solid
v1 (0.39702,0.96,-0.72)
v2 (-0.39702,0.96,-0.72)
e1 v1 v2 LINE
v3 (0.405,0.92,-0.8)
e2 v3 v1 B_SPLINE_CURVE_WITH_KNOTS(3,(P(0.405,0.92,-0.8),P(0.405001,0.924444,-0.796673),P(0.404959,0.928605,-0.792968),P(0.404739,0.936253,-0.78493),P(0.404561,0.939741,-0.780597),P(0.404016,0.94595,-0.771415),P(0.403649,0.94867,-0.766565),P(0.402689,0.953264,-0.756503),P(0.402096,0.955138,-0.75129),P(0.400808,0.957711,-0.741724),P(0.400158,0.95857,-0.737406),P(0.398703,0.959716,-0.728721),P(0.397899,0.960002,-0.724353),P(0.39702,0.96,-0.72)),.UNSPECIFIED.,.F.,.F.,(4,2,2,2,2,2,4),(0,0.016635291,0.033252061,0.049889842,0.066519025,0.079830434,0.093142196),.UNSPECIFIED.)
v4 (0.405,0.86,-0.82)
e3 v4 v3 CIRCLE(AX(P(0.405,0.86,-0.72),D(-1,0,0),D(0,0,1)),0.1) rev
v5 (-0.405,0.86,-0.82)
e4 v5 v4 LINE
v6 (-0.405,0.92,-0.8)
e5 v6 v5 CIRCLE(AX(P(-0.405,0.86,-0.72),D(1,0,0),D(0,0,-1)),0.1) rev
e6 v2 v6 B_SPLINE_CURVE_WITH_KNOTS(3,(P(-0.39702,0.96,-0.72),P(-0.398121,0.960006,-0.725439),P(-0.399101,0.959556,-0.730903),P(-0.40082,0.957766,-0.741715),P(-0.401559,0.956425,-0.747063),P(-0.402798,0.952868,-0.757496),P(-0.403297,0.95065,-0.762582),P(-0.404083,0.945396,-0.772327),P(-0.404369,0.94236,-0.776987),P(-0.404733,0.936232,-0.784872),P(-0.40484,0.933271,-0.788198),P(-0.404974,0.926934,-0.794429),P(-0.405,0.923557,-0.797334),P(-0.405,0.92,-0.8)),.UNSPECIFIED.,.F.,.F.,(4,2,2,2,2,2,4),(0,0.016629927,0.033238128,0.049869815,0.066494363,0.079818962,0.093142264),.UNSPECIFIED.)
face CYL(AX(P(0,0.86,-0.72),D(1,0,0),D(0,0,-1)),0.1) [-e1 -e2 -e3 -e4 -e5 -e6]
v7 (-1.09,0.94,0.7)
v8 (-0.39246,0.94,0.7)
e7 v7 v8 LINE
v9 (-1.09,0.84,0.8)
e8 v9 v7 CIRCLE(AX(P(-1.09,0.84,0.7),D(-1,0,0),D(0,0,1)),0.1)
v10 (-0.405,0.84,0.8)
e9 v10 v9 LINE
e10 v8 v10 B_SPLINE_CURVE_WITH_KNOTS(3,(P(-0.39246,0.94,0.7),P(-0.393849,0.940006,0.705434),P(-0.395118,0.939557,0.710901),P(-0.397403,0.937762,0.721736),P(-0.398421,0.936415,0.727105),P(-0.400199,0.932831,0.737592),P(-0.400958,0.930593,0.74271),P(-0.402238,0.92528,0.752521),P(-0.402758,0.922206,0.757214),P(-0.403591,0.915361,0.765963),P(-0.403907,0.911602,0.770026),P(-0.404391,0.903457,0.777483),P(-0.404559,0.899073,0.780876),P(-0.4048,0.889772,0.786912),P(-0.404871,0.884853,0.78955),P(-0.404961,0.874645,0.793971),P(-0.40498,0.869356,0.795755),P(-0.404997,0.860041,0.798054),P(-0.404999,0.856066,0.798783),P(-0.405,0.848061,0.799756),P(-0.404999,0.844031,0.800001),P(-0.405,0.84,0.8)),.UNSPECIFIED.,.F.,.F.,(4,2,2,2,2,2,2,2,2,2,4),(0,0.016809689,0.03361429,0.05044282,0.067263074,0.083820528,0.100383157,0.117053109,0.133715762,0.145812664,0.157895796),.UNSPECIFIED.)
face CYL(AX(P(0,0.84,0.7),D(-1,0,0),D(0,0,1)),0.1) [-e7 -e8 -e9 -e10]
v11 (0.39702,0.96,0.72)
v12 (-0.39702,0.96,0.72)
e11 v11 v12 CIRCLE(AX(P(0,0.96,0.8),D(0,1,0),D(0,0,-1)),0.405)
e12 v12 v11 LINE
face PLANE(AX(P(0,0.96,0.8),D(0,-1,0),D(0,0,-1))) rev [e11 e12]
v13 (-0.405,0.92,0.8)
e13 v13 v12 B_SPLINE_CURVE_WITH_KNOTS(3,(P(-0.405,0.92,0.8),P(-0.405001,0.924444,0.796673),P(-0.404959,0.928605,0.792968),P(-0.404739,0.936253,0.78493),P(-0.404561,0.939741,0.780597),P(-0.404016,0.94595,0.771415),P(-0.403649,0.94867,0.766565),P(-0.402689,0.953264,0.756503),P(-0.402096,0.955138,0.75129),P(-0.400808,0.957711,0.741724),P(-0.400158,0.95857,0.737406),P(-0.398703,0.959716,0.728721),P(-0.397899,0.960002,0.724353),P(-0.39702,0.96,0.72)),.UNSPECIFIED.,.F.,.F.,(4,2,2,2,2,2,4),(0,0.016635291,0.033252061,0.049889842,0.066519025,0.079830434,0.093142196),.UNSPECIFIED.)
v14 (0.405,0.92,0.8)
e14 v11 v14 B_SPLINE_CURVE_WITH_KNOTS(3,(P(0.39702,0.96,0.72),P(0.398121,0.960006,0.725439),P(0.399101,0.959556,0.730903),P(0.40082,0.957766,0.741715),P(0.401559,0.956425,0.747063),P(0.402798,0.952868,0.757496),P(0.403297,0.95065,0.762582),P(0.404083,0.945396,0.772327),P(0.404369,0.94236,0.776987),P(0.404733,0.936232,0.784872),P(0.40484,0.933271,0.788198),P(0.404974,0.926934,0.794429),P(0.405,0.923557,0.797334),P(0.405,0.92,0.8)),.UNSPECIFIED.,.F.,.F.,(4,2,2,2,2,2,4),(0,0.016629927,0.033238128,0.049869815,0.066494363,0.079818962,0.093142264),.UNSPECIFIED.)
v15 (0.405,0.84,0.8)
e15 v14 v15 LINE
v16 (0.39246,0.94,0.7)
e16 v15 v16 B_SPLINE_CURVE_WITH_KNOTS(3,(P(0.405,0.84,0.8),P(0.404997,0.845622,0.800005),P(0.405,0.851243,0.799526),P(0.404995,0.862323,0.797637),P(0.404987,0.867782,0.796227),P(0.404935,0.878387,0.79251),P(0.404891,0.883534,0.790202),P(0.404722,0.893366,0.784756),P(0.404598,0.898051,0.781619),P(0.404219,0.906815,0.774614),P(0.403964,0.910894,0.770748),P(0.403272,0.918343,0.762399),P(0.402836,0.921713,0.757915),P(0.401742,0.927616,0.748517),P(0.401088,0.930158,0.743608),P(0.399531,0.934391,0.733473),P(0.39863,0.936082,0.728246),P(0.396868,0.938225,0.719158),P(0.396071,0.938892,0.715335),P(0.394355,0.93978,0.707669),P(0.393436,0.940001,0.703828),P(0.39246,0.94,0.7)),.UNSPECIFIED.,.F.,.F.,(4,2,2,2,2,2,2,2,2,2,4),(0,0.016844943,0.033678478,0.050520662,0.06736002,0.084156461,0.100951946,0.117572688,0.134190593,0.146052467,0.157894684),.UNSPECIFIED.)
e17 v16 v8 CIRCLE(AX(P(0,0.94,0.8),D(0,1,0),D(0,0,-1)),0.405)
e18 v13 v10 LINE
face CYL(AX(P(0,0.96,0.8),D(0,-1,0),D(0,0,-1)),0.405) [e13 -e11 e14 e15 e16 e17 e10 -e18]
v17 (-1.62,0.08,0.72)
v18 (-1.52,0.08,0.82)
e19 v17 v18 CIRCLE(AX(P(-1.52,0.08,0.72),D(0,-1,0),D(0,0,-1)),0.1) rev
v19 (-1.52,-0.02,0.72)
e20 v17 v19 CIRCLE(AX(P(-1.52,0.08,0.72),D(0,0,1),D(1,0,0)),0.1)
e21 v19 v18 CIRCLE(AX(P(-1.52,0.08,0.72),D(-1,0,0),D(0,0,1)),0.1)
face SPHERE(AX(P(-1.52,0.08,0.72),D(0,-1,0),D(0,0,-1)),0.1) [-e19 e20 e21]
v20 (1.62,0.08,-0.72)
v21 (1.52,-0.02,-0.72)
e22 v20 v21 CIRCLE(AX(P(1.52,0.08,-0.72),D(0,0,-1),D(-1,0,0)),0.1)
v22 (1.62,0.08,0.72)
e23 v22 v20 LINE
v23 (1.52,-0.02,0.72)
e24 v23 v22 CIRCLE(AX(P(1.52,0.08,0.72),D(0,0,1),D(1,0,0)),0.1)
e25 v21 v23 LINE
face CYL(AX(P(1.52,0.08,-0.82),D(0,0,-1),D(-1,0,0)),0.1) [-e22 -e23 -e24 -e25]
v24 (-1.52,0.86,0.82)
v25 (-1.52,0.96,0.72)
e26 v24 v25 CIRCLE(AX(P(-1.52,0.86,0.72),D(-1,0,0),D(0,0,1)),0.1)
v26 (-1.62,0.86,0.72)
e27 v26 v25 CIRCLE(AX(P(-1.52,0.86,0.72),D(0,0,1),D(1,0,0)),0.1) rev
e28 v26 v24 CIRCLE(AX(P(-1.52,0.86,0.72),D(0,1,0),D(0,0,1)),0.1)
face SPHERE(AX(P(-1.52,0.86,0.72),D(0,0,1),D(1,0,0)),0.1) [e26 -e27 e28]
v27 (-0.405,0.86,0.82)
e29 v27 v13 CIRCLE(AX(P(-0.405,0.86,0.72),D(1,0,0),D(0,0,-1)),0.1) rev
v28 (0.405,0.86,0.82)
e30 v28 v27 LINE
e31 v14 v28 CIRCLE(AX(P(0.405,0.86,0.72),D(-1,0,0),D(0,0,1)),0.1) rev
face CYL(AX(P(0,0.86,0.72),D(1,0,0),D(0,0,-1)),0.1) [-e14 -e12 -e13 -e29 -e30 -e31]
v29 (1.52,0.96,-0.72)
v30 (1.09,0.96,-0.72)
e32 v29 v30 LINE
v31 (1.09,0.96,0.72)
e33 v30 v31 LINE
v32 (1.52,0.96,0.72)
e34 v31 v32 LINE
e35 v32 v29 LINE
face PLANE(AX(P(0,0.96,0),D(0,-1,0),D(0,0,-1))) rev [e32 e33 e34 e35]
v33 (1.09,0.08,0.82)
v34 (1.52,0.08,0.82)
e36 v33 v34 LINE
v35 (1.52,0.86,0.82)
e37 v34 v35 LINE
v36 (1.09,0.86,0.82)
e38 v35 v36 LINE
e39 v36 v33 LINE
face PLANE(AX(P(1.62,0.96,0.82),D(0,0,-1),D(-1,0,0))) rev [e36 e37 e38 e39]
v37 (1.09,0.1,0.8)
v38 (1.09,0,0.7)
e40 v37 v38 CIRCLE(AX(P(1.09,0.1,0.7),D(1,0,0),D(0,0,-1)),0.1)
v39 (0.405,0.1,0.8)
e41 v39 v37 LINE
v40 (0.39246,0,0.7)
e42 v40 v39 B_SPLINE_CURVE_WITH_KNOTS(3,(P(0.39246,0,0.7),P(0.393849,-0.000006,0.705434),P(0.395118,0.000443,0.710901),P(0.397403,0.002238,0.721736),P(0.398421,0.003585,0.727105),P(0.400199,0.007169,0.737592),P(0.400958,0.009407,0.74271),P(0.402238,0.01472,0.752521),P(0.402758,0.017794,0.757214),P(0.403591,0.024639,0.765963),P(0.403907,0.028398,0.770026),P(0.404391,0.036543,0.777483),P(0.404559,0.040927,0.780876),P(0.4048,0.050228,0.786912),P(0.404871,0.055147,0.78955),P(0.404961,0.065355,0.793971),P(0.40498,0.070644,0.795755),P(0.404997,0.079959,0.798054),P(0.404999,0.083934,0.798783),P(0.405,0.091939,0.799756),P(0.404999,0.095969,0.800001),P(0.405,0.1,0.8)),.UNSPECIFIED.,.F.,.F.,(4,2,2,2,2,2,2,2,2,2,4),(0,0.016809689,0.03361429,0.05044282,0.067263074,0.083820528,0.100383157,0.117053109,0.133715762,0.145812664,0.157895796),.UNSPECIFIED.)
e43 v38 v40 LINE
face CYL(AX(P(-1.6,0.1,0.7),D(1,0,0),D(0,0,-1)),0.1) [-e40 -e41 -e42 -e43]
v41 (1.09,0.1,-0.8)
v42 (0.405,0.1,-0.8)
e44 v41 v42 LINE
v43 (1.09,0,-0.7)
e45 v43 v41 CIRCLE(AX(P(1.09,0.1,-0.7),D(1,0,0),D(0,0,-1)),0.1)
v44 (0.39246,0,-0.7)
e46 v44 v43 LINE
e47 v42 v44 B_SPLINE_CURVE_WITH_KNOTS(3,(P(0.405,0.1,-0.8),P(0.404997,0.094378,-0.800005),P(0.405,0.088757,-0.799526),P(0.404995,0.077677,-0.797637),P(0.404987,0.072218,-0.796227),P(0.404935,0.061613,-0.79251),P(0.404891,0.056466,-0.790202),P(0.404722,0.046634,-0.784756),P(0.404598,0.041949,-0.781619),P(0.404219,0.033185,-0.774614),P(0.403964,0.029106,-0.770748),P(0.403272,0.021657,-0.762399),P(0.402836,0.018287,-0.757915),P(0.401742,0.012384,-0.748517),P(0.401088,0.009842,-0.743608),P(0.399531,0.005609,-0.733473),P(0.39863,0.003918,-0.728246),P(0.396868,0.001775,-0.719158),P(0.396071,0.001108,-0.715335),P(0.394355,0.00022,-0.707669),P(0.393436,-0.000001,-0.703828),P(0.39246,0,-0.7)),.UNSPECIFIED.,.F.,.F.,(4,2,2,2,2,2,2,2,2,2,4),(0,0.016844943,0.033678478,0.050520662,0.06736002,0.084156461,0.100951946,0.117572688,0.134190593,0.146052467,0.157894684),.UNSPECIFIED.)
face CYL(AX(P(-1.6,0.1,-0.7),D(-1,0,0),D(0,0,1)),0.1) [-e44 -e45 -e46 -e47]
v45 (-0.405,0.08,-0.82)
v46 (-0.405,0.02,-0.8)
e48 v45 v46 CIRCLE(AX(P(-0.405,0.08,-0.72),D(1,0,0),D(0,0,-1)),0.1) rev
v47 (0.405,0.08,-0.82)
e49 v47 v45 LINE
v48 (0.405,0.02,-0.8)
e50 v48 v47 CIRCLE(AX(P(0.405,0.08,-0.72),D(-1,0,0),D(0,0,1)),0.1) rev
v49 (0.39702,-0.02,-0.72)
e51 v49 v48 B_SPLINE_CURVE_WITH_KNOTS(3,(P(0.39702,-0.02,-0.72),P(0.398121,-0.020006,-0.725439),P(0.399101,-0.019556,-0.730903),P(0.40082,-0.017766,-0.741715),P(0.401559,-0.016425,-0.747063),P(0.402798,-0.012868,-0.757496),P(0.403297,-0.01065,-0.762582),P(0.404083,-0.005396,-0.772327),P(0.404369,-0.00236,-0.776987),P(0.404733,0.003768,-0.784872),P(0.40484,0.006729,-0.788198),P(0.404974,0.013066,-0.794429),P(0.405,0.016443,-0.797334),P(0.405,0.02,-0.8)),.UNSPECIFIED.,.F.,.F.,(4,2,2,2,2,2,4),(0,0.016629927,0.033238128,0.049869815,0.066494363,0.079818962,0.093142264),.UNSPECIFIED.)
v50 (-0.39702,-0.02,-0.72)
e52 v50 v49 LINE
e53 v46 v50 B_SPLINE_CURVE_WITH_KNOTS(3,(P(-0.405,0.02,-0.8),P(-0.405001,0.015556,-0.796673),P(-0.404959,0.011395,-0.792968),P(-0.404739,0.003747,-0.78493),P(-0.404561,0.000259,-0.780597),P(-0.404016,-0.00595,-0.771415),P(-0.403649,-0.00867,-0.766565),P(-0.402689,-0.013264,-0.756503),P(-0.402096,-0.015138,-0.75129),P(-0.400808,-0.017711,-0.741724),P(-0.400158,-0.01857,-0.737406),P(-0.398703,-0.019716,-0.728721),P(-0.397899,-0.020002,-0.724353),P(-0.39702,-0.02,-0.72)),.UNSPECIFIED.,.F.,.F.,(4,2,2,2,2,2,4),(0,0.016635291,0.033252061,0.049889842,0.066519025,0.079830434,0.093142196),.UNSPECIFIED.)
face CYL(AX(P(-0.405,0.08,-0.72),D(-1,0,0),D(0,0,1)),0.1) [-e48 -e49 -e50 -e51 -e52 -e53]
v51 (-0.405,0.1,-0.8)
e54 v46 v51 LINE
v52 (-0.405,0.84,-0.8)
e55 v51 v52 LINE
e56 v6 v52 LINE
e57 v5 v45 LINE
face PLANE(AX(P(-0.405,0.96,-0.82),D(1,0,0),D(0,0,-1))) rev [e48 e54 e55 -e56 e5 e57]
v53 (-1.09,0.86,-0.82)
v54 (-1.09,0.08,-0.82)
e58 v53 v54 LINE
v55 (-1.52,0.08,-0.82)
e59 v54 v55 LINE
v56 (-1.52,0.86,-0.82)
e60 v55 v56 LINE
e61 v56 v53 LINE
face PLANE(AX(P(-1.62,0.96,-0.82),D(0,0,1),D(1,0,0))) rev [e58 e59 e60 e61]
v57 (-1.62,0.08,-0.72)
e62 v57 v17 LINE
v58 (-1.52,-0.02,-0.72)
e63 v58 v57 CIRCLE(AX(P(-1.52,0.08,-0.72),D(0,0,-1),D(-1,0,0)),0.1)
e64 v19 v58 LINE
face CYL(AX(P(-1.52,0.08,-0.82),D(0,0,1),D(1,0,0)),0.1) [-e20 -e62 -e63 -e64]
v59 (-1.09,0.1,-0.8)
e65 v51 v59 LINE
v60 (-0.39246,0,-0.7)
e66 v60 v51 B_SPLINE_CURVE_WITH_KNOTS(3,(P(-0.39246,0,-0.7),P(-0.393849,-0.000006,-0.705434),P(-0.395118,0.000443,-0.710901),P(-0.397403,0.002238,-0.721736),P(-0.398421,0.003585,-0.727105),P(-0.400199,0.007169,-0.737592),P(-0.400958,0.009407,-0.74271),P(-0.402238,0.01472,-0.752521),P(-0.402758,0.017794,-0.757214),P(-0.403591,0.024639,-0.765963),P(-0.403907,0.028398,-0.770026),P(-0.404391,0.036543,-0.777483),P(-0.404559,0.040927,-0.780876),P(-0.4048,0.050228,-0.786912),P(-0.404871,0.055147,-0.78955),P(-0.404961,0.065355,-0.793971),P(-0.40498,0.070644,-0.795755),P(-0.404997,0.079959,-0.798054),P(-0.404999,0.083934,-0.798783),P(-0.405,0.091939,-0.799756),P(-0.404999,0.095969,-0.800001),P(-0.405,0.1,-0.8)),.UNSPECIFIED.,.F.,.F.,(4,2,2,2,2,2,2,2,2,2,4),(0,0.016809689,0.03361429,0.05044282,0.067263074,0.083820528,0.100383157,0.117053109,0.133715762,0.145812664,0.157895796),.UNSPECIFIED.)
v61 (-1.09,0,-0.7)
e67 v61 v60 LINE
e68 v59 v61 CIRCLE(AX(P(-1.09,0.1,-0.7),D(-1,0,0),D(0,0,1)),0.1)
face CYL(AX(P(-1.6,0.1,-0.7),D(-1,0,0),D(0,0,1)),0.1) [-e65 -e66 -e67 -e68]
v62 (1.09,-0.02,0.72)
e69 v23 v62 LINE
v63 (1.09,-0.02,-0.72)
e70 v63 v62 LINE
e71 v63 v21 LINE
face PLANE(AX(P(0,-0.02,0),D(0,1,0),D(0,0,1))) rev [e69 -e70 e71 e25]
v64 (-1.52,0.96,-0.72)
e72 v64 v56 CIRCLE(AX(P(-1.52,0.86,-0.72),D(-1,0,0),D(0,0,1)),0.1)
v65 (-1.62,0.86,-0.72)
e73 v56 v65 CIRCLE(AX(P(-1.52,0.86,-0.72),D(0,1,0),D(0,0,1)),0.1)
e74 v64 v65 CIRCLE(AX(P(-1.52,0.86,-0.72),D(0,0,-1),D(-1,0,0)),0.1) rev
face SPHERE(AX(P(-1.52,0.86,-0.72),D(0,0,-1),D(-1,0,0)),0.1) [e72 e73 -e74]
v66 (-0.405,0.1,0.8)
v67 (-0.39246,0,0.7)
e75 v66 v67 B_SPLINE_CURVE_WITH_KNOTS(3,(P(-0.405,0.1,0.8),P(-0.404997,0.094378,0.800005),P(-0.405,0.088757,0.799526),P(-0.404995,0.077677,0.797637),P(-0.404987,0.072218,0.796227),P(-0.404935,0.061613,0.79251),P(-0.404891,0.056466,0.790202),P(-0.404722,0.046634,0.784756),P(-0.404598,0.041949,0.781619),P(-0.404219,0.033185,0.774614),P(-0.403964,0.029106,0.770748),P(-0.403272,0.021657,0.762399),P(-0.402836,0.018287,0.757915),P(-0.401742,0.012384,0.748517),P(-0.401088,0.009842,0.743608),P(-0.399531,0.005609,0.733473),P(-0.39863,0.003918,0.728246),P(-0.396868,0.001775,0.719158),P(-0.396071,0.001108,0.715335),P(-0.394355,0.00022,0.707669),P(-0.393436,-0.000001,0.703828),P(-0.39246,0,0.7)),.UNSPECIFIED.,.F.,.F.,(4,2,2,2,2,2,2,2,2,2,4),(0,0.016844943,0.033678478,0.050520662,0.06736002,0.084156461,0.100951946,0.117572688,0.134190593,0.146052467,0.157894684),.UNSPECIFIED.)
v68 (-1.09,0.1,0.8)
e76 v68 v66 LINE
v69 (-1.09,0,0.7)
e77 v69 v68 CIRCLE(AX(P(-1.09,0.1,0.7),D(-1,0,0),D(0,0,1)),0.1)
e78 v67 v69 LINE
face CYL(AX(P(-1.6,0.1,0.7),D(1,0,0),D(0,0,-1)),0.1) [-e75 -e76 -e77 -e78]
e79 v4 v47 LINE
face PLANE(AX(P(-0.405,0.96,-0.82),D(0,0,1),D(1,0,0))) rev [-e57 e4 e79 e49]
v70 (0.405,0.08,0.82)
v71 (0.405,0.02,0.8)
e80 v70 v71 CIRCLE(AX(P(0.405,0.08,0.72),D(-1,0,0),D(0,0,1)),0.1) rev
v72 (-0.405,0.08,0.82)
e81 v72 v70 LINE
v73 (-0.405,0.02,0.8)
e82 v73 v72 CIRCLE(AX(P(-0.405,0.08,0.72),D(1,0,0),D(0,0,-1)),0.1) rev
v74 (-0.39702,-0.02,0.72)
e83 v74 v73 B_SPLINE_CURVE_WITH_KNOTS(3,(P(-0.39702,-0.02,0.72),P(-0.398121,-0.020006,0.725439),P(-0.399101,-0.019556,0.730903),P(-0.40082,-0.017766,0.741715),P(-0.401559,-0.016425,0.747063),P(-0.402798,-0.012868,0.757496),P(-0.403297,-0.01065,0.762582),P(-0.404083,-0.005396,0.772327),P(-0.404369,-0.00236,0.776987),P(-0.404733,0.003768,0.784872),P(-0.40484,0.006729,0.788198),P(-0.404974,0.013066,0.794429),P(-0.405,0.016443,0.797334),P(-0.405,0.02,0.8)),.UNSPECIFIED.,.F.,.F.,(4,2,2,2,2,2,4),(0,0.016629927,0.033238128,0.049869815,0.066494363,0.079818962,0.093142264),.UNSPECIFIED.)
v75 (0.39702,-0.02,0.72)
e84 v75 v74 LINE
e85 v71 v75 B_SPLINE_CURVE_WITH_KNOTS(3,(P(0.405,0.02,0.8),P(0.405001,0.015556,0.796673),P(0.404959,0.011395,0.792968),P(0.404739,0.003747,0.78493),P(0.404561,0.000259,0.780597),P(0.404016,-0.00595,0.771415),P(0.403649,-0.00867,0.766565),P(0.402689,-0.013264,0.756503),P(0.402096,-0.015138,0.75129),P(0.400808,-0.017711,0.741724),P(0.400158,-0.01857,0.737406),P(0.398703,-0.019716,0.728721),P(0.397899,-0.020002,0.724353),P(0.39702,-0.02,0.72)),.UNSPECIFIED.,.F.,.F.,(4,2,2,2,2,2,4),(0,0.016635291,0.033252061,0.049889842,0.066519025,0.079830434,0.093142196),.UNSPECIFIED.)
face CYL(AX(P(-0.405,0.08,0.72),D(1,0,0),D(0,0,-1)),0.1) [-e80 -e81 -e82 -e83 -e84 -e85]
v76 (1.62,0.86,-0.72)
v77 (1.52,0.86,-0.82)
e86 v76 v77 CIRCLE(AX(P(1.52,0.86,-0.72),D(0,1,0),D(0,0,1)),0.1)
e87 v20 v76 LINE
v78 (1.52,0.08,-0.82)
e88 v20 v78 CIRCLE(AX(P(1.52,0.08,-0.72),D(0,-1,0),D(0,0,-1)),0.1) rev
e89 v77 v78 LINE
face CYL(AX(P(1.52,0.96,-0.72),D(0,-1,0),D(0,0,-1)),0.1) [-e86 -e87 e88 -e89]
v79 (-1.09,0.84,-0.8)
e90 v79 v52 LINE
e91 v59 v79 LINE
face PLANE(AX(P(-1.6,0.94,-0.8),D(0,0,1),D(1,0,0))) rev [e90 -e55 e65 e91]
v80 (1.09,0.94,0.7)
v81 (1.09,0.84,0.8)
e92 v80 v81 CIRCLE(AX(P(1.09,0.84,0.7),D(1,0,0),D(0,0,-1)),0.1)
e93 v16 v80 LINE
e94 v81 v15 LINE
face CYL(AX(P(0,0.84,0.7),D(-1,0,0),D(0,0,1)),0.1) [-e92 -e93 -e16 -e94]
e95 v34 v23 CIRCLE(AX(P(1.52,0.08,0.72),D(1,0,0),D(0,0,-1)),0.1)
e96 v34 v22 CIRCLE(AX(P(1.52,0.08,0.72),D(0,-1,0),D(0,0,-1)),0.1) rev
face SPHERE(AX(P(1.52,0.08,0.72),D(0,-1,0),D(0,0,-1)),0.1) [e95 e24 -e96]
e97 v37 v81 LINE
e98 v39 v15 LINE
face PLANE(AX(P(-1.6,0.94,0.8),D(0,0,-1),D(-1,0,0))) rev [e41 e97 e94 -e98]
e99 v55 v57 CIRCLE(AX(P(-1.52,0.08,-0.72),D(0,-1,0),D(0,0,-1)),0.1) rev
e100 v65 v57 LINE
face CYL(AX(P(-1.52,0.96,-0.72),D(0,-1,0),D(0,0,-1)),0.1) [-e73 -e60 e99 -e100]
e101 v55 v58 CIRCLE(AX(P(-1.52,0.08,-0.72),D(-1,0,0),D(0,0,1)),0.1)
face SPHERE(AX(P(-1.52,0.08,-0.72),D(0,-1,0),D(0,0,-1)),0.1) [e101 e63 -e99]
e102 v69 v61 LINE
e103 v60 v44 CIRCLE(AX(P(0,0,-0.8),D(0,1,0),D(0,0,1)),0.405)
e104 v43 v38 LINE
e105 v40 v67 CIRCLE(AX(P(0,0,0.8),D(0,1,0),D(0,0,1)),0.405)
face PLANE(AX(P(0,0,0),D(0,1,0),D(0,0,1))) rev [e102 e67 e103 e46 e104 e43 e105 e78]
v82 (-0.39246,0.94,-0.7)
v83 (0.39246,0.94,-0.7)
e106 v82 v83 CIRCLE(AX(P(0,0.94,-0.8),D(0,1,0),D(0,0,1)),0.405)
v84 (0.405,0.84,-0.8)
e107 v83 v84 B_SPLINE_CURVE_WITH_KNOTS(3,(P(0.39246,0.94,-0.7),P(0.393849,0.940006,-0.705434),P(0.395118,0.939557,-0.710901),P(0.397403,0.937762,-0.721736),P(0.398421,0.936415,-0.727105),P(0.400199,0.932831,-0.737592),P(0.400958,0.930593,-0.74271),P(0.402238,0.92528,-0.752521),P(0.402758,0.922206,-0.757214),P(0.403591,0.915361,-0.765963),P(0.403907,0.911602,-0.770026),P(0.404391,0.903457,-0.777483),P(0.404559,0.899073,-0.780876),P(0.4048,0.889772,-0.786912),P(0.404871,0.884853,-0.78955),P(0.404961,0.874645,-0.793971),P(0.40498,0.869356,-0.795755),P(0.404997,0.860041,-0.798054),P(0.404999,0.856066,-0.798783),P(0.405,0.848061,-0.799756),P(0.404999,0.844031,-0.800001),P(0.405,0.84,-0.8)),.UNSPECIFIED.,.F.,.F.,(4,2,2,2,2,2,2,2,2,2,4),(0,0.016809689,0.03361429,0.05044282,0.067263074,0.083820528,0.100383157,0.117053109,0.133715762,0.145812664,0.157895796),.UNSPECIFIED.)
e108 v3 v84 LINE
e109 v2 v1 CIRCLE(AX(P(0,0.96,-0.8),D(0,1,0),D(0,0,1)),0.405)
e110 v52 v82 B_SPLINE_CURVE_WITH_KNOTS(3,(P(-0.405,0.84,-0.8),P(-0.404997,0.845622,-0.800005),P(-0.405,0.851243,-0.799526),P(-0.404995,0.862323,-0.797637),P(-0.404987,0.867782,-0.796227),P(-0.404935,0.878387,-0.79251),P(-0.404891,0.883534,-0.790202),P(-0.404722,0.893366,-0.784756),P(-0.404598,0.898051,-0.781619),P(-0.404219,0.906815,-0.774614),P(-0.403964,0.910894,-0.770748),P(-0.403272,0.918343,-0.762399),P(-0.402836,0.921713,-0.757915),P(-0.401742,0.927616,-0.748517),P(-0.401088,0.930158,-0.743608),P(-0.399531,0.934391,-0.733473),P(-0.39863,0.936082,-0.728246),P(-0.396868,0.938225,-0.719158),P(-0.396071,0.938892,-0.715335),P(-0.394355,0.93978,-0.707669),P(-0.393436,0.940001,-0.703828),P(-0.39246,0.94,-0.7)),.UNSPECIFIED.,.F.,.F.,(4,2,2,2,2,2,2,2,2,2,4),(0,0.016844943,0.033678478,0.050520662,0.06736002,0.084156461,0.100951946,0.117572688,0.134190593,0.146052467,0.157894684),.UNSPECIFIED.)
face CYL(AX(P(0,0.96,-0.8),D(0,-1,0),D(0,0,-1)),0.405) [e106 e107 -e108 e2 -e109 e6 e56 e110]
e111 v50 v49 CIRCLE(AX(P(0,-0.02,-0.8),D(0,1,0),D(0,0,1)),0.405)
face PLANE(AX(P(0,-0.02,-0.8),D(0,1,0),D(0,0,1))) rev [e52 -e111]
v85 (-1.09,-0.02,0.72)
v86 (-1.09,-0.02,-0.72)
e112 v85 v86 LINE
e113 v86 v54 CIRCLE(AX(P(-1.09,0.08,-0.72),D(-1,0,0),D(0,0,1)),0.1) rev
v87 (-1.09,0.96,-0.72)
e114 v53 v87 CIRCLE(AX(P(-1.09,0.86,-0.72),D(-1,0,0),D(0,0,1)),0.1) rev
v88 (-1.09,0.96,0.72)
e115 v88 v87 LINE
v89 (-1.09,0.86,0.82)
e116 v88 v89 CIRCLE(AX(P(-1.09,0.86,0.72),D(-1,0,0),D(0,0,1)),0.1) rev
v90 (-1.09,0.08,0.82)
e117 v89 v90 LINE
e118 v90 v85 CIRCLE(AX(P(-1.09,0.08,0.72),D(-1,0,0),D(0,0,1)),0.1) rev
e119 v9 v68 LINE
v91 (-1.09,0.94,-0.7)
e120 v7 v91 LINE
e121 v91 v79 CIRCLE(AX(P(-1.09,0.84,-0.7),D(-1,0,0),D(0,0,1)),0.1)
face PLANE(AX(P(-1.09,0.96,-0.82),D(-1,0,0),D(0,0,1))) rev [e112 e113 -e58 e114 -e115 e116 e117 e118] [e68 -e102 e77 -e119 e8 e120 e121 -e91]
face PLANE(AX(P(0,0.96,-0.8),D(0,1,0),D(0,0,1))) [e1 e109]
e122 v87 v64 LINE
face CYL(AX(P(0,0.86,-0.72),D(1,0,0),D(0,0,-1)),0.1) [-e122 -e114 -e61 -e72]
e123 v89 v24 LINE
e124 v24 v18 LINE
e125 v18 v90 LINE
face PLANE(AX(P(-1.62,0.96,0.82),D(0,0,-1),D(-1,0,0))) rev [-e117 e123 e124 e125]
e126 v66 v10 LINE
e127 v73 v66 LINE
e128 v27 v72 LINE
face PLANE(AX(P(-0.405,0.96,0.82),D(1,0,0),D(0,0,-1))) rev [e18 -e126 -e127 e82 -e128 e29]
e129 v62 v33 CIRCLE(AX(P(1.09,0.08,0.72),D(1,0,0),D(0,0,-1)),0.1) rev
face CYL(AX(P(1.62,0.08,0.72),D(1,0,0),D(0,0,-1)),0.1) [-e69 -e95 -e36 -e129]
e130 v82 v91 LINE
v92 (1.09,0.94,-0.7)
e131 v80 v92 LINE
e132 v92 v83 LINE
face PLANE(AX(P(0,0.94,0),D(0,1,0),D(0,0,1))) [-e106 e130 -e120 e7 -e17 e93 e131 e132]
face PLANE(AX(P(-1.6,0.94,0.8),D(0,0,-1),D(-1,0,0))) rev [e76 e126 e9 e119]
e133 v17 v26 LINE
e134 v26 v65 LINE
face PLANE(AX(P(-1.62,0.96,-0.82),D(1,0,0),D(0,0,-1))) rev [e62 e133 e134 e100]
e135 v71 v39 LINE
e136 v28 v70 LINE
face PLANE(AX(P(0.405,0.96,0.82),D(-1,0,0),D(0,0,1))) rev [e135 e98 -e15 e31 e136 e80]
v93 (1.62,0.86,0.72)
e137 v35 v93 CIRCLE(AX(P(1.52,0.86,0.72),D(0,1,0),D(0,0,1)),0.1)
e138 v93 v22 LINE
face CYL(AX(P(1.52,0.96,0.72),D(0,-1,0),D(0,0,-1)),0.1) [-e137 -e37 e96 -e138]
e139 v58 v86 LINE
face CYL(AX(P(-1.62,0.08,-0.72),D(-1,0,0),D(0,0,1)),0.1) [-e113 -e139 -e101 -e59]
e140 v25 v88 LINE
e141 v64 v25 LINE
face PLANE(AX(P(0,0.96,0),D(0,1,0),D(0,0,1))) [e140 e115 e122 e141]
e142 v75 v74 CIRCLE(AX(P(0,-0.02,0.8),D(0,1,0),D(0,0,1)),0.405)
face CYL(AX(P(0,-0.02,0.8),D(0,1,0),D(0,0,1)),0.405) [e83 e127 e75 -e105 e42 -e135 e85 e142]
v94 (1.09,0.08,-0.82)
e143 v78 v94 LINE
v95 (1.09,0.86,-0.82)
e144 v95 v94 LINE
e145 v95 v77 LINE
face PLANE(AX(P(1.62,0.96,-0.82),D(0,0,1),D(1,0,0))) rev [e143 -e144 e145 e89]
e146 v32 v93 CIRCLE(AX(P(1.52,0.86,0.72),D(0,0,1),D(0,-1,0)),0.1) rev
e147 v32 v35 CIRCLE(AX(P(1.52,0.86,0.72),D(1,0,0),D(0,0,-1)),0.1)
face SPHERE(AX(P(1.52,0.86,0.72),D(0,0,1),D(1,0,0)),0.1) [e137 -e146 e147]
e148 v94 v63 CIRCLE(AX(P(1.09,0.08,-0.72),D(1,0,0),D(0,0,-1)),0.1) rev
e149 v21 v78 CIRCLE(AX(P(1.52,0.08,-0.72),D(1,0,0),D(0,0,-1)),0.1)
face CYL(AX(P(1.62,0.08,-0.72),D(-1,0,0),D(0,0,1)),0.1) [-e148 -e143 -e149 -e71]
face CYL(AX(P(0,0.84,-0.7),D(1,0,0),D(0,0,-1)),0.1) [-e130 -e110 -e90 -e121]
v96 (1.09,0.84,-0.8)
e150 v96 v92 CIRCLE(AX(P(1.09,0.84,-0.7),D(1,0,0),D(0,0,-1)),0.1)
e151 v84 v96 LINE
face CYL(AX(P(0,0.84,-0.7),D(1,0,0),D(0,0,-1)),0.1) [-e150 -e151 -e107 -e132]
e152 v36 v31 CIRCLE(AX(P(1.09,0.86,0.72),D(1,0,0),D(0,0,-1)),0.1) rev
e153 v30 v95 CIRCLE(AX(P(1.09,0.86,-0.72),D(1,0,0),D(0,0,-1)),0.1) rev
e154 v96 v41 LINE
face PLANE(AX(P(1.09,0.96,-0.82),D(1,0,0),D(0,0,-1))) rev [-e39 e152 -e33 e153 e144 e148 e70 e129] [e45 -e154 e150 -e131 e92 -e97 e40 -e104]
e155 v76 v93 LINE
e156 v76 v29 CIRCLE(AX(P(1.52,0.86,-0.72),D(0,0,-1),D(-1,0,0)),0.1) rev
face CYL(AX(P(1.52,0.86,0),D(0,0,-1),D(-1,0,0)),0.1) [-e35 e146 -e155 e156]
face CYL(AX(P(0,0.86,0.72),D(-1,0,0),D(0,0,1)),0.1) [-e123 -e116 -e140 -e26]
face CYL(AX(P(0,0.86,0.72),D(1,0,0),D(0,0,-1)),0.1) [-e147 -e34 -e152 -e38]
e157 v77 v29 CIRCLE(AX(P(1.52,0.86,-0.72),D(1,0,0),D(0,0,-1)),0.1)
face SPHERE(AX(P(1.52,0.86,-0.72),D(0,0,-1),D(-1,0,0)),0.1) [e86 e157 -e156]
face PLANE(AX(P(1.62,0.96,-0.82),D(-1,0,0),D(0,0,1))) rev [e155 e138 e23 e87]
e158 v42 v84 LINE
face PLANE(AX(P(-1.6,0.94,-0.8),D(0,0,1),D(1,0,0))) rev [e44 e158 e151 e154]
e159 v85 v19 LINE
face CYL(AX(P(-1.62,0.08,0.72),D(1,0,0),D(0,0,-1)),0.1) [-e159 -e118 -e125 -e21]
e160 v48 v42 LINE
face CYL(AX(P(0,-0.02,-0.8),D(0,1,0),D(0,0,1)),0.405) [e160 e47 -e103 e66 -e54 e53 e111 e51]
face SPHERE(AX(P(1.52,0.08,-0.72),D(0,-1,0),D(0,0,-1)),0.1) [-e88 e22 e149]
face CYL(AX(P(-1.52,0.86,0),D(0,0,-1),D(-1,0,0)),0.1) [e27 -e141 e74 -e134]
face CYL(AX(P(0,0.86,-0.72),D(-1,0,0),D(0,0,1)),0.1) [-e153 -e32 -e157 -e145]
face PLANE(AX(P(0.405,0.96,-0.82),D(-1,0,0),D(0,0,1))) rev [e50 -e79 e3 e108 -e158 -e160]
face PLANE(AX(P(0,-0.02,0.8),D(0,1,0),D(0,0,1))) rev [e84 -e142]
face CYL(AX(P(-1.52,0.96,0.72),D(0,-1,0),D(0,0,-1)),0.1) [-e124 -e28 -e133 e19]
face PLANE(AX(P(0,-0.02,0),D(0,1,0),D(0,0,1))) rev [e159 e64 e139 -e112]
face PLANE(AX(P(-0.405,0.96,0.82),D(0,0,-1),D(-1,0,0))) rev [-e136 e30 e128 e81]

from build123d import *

# Parameters (mm, degrees)
SKETCH1_W           = 3.2
SKETCH1_H           = 1.6
BOSS_EXTRUDE1_DEPTH = 0.94
SKETCH2_W           = 0.53
SKETCH2_H           = 1.64
BOSS_EXTRUDE2_DEPTH = 0.02
BOSS_EXTRUDE3_START = -0.96
SKETCH3_W           = 0.53
SKETCH3_H           = 1.64
BOSS_EXTRUDE3_DEPTH = 0.96
FILLET1_R           = 0.1
FILLET2_START       = -1
FILLET2_DEPTH       = 2


with BuildPart() as part:
    # Sketch1 → Boss-Extrude1 (new body)
    with BuildSketch(Plane(origin=(0, 0, 0), x_dir=(1, 0, 0), z_dir=(0, 1, 0))):
        Rectangle(SKETCH1_W, SKETCH1_H)
    extrude(amount=BOSS_EXTRUDE1_DEPTH)

    # Sketch2 → Boss-Extrude2 (add)
    with BuildSketch(Plane(origin=(0, 0.94, 0), x_dir=(1, 0, 0), z_dir=(0, 1, 0))):
        with BuildLine():
            Line((-0.405, 0.82), (-0.405, 0.8))
            ThreePointArc((-0.405, 0.8), (0, 0.395), (0.405, 0.8))
            Line((0.405, 0.8), (0.405, 0.82))
            Line((0.405, 0.82), (-0.405, 0.82))
        make_face()
        with Locations((-1.355, 0)):
            Rectangle(SKETCH2_W, SKETCH2_H)
        with Locations((1.355, 0)):
            Rectangle(SKETCH2_W, SKETCH2_H)
        with BuildLine():
            Line((-0.405, -0.82), (-0.405, -0.8))
            ThreePointArc((-0.405, -0.8), (0, -0.395), (0.405, -0.8))
            Line((0.405, -0.8), (0.405, -0.82))
            Line((0.405, -0.82), (-0.405, -0.82))
        make_face()
    extrude(amount=BOSS_EXTRUDE2_DEPTH)

    # Sketch3 → Boss-Extrude3 (add)
    with BuildSketch(Plane(origin=(0, 0.94, 0), x_dir=(1, 0, 0), z_dir=(0, 1, 0)).offset(BOSS_EXTRUDE3_START)):
        with Locations((-1.355, 0)):
            Rectangle(SKETCH3_W, SKETCH3_H)
        with BuildLine():
            Line((-0.405, 0.82), (-0.405, 0.8))
            ThreePointArc((-0.405, 0.8), (0, 0.395), (0.405, 0.8))
            Line((0.405, 0.8), (0.405, 0.82))
            Line((0.405, 0.82), (-0.405, 0.82))
        make_face()
        with BuildLine():
            Line((-0.405, -0.8), (-0.405, -0.82))
            Line((-0.405, -0.82), (0.405, -0.82))
            Line((0.405, -0.82), (0.405, -0.8))
            ThreePointArc((0.405, -0.8), (0, -0.395), (-0.405, -0.8))
        make_face()
        with Locations((1.355, 0)):
            Rectangle(SKETCH3_W, SKETCH3_H)
    extrude(amount=BOSS_EXTRUDE3_DEPTH)

    # Fillet1
    # the kernel refuses this fillet: 0.1 mm, written as the material it takes off along each edge
    with BuildSketch(Plane(origin=(1.52, 0.08, 0.72), x_dir=(0, -1, 0), z_dir=(1, 0, 0))) as fillet1_piece_1_section:
        Polygon((0, 0), (FILLET1_R, 0), (FILLET1_R, -FILLET1_R), (0, -FILLET1_R), align=None)
    fillet1_piece_1 = extrude(amount=FILLET1_R, mode=Mode.PRIVATE)
    fillet1_piece_1 = fillet1_piece_1 - Plane(origin=(1.52, 0.08, 0.72), x_dir=(1.184975440516056e-15, 0.7071067811865475, -0.7071067811865475), z_dir=(1, 0, 0)) * Sphere(FILLET1_R, mode=Mode.PRIVATE)
    add(fillet1_piece_1, mode=Mode.SUBTRACT)
    with BuildSketch(Plane(origin=(1.52, 0.08, -0.72), x_dir=(0, 0, -1), z_dir=(1, 0, 0))) as fillet1_piece_2_section:
        Polygon((0, 0), (FILLET1_R, 0), (FILLET1_R, -FILLET1_R), (0, -FILLET1_R), align=None)
    fillet1_piece_2 = extrude(amount=FILLET1_R, mode=Mode.PRIVATE)
    fillet1_piece_2 = fillet1_piece_2 - Plane(origin=(1.52, 0.08, -0.72), x_dir=(0, 0.7071067811865475, 0.7071067811865475), z_dir=(1, 0, 0)) * Sphere(FILLET1_R, mode=Mode.PRIVATE)
    add(fillet1_piece_2, mode=Mode.SUBTRACT)
    with BuildSketch(Plane(origin=(-1.52, 0.08, -0.72), x_dir=(-1, 0, 0), z_dir=(0, 0, -1))) as fillet1_piece_3_section:
        Polygon((0, 0), (FILLET1_R, 0), (FILLET1_R, -FILLET1_R), (0, -FILLET1_R), align=None)
    fillet1_piece_3 = extrude(amount=FILLET1_R, mode=Mode.PRIVATE)
    fillet1_piece_3 = fillet1_piece_3 - Plane(origin=(-1.52, 0.08, -0.72), x_dir=(0.7071067811865475, 0.7071067811865475, 0), z_dir=(0, 0, -1)) * Sphere(FILLET1_R, mode=Mode.PRIVATE)
    add(fillet1_piece_3, mode=Mode.SUBTRACT)
    with BuildSketch(Plane(origin=(-1.52, 0.86, -0.72), x_dir=(-1, 0, 0), z_dir=(0, 0, -1))) as fillet1_piece_4_section:
        Polygon((0, 0), (FILLET1_R, 0), (FILLET1_R, FILLET1_R), (0, FILLET1_R), align=None)
    fillet1_piece_4 = extrude(amount=FILLET1_R, mode=Mode.PRIVATE)
    fillet1_piece_4 = fillet1_piece_4 - Plane(origin=(-1.52, 0.86, -0.72), x_dir=(0.7071067811865475, -0.7071067811865475, 0), z_dir=(0, 0, -1)) * Sphere(FILLET1_R, mode=Mode.PRIVATE)
    add(fillet1_piece_4, mode=Mode.SUBTRACT)
    with BuildSketch(Plane(origin=(-1.52, 0.86, 0.72), x_dir=(0, 1, 0), z_dir=(-1, 0, 0))) as fillet1_piece_5_section:
        Polygon((0, 0), (FILLET1_R, 0), (FILLET1_R, -FILLET1_R), (0, -FILLET1_R), align=None)
    fillet1_piece_5 = extrude(amount=FILLET1_R, mode=Mode.PRIVATE)
    fillet1_piece_5 = fillet1_piece_5 - Plane(origin=(-1.52, 0.86, 0.72), x_dir=(0, -0.7071067811865475, -0.7071067811865475), z_dir=(-1, 0, 0)) * Sphere(FILLET1_R, mode=Mode.PRIVATE)
    add(fillet1_piece_5, mode=Mode.SUBTRACT)
    with BuildSketch(Plane(origin=(-1.52, 0.08, 0.72), x_dir=(0, 0, 1), z_dir=(-1, 0, 0))) as fillet1_piece_6_section:
        Polygon((0, 0), (FILLET1_R, 0), (FILLET1_R, -FILLET1_R), (0, -FILLET1_R), align=None)
    fillet1_piece_6 = extrude(amount=FILLET1_R, mode=Mode.PRIVATE)
    fillet1_piece_6 = fillet1_piece_6 - Plane(origin=(-1.52, 0.08, 0.72), x_dir=(0, 0.7071067811865475, -0.7071067811865475), z_dir=(-1, 0, 0)) * Sphere(FILLET1_R, mode=Mode.PRIVATE)
    add(fillet1_piece_6, mode=Mode.SUBTRACT)
    with BuildSketch(Plane(origin=(1.52, 0.86, 0.72), x_dir=(0, 1, 0), z_dir=(1, 0, 0))) as fillet1_piece_7_section:
        Polygon((0, 0), (FILLET1_R, 0), (FILLET1_R, FILLET1_R), (0, FILLET1_R), align=None)
    fillet1_piece_7 = extrude(amount=FILLET1_R, mode=Mode.PRIVATE)
    fillet1_piece_7 = fillet1_piece_7 - Plane(origin=(1.52, 0.86, 0.72), x_dir=(1.184975440516056e-15, -0.7071067811865475, -0.7071067811865475), z_dir=(1, 0, 0)) * Sphere(FILLET1_R, mode=Mode.PRIVATE)
    add(fillet1_piece_7, mode=Mode.SUBTRACT)
    with BuildSketch(Plane(origin=(1.52, 0.86, -0.72), x_dir=(0, 1, 0), z_dir=(1, 0, 0))) as fillet1_piece_8_section:
        Polygon((0, 0), (FILLET1_R, 0), (FILLET1_R, -FILLET1_R), (0, -FILLET1_R), align=None)
    fillet1_piece_8 = extrude(amount=FILLET1_R, mode=Mode.PRIVATE)
    fillet1_piece_8 = fillet1_piece_8 - Plane(origin=(1.52, 0.86, -0.72), x_dir=(0, -0.7071067811865475, 0.7071067811865475), z_dir=(1, 0, 0)) * Sphere(FILLET1_R, mode=Mode.PRIVATE)
    add(fillet1_piece_8, mode=Mode.SUBTRACT)
    with BuildSketch(Plane(origin=(0.155, 0, -0.8), x_dir=(0, 1, 0), z_dir=(1, 0, 0))) as fillet1_piece_9_section:
        with BuildLine():
            CenterArc((FILLET1_R, FILLET1_R), FILLET1_R, 180, 90)
            Line((0, FILLET1_R), (0, 0))
            Line((0, 0), (FILLET1_R, 0))
        make_face()
    fillet1_piece_9 = extrude(amount=0.935, mode=Mode.PRIVATE)
    fillet1_piece_9 = fillet1_piece_9 - Plane(origin=(0, 0, -0.8), x_dir=(-1, 0, 0), z_dir=(0, -1, 0)) * Cylinder(0.405, 3, mode=Mode.PRIVATE)
    add(fillet1_piece_9, mode=Mode.SUBTRACT)
    with BuildSketch(Plane(origin=(1.62, -0.02, 0.72), x_dir=(0, 1, 0), z_dir=(0, 0, -1)), Plane(origin=(-1.62, 0.96, 0.72), x_dir=(0, -1, 0), z_dir=(0, 0, -1)), Plane(origin=(1.62, 0.96, -0.72), x_dir=(0, -1, 0), z_dir=(0, 0, 1)), Plane(origin=(-1.62, -0.02, -0.72), x_dir=(0, 1, 0), z_dir=(0, 0, 1))) as fillet1_piece_10:
        with BuildLine():
            CenterArc((FILLET1_R, -FILLET1_R), FILLET1_R, 90, 90)
            Line((0, -FILLET1_R), (0, 0))
            Line((0, 0), (FILLET1_R, 0))
        make_face()
    extrude(amount=1.44, mode=Mode.SUBTRACT)
    with BuildSketch(Plane(origin=(0.84, -0.02, 0.82), x_dir=(0, 1, 0), z_dir=(1, 0, 0)), Plane(origin=(1.52, -0.02, -0.82), x_dir=(0, 1, 0), z_dir=(-1, 0, 0)), Plane(origin=(-1.52, 0.96, -0.82), x_dir=(0, -1, 0), z_dir=(1, 0, 0)), Plane(origin=(1.52, 0.96, 0.82), x_dir=(0, -1, 0), z_dir=(-1, 0, 0)), Plane(origin=(-0.84, -0.02, -0.82), x_dir=(0, 1, 0), z_dir=(-1, 0, 0)), Plane(origin=(-1.52, -0.02, 0.82), x_dir=(0, 1, 0), z_dir=(1, 0, 0))) as fillet1_piece_11:
        with BuildLine():
            CenterArc((FILLET1_R, -FILLET1_R), FILLET1_R, 90, 90)
            Line((0, -FILLET1_R), (0, 0))
            Line((0, 0), (FILLET1_R, 0))
        make_face()
    extrude(amount=0.68, mode=Mode.SUBTRACT)
    with BuildSketch(Plane(origin=(-0.155, 0.94, 0.8), x_dir=(0, -1, 0), z_dir=(-1, 0, 0))) as fillet1_piece_12_section:
        with BuildLine():
            CenterArc((FILLET1_R, -FILLET1_R), FILLET1_R, 90, 90)
            Line((0, -FILLET1_R), (0, 0))
            Line((0, 0), (FILLET1_R, 0))
        make_face()
    fillet1_piece_12 = extrude(amount=0.935, mode=Mode.PRIVATE)
    fillet1_piece_12 = fillet1_piece_12 - Plane(origin=(0, 0.94, 0.8), x_dir=(-1, 0, 0), z_dir=(0, -1, 0)) * Cylinder(0.405, 3, mode=Mode.PRIVATE)
    add(fillet1_piece_12, mode=Mode.SUBTRACT)
    with BuildSketch(Plane(origin=(-1.62, 0.08, -0.82), x_dir=(1, 0, 0), z_dir=(0, 1, 0)), Plane(origin=(1.62, 0.08, 0.82), x_dir=(-1, 0, 0), z_dir=(0, 1, 0))) as fillet1_piece_13:
        with BuildLine():
            CenterArc((FILLET1_R, -FILLET1_R), FILLET1_R, 90, 90)
            Line((0, -FILLET1_R), (0, 0))
            Line((0, 0), (FILLET1_R, 0))
        make_face()
    extrude(amount=0.78, mode=Mode.SUBTRACT)
    with BuildSketch(Plane(origin=(-1.62, 0.86, 0.82), x_dir=(0, 0, -1), z_dir=(0, -1, 0)), Plane(origin=(1.62, 0.86, -0.82), x_dir=(0, 0, 1), z_dir=(0, -1, 0))) as fillet1_piece_14:
        with BuildLine():
            CenterArc((FILLET1_R, FILLET1_R), FILLET1_R, 180, 90)
            Line((0, FILLET1_R), (0, 0))
            Line((0, 0), (FILLET1_R, 0))
        make_face()
    extrude(amount=0.78, mode=Mode.SUBTRACT)
    with BuildSketch(Plane(origin=(-0.84, 0.96, 0.82), x_dir=(0, 0, -1), z_dir=(-1, 0, 0)), Plane(origin=(0.84, 0.96, -0.82), x_dir=(0, 0, 1), z_dir=(1, 0, 0))) as fillet1_piece_15:
        with BuildLine():
            CenterArc((FILLET1_R, FILLET1_R), FILLET1_R, 180, 90)
            Line((0, FILLET1_R), (0, 0))
            Line((0, 0), (FILLET1_R, 0))
        make_face()
    extrude(amount=0.68, mode=Mode.SUBTRACT)
    with BuildSketch(Plane(origin=(-1.09, 0.94, -0.8), x_dir=(0, -1, 0), z_dir=(1, 0, 0))) as fillet1_piece_16_section:
        with BuildLine():
            CenterArc((FILLET1_R, -FILLET1_R), FILLET1_R, 90, 90)
            Line((0, -FILLET1_R), (0, 0))
            Line((0, 0), (FILLET1_R, 0))
        make_face()
    fillet1_piece_16 = extrude(amount=0.935, mode=Mode.PRIVATE)
    fillet1_piece_16 = fillet1_piece_16 - Plane(origin=(0, 0.94, -0.8), x_dir=(-1, 0, 0), z_dir=(0, -1, 0)) * Cylinder(0.405, 3, mode=Mode.PRIVATE)
    add(fillet1_piece_16, mode=Mode.SUBTRACT)
    with BuildSketch(Plane(origin=(0.155, 0.94, -0.8), x_dir=(0, -1, 0), z_dir=(1, 0, 0))) as fillet1_piece_17_section:
        with BuildLine():
            CenterArc((FILLET1_R, -FILLET1_R), FILLET1_R, 90, 90)
            Line((0, -FILLET1_R), (0, 0))
            Line((0, 0), (FILLET1_R, 0))
        make_face()
    fillet1_piece_17 = extrude(amount=0.935, mode=Mode.PRIVATE)
    fillet1_piece_17 = fillet1_piece_17 - Plane(origin=(0, 0.94, -0.8), x_dir=(-1, 0, 0), z_dir=(0, -1, 0)) * Cylinder(0.405, 3, mode=Mode.PRIVATE)
    add(fillet1_piece_17, mode=Mode.SUBTRACT)
    with BuildSketch(Plane(origin=(1.09, 0.94, 0.8), x_dir=(0, -1, 0), z_dir=(-1, 0, 0))) as fillet1_piece_18_section:
        with BuildLine():
            CenterArc((FILLET1_R, -FILLET1_R), FILLET1_R, 90, 90)
            Line((0, -FILLET1_R), (0, 0))
            Line((0, 0), (FILLET1_R, 0))
        make_face()
    fillet1_piece_18 = extrude(amount=0.935, mode=Mode.PRIVATE)
    fillet1_piece_18 = fillet1_piece_18 - Plane(origin=(0, 0.94, 0.8), x_dir=(-1, 0, 0), z_dir=(0, -1, 0)) * Cylinder(0.405, 3, mode=Mode.PRIVATE)
    add(fillet1_piece_18, mode=Mode.SUBTRACT)
    with BuildSketch(Plane(origin=(-0.155, 0, 0.8), x_dir=(0, 1, 0), z_dir=(-1, 0, 0))) as fillet1_piece_19_section:
        with BuildLine():
            CenterArc((FILLET1_R, FILLET1_R), FILLET1_R, 180, 90)
            Line((0, FILLET1_R), (0, 0))
            Line((0, 0), (FILLET1_R, 0))
        make_face()
    fillet1_piece_19 = extrude(amount=0.935, mode=Mode.PRIVATE)
    fillet1_piece_19 = fillet1_piece_19 - Plane(origin=(0, 0, 0.8), x_dir=(1, 0, 0), z_dir=(0, -1, 0)) * Cylinder(0.405, 3, mode=Mode.PRIVATE)
    add(fillet1_piece_19, mode=Mode.SUBTRACT)
    with BuildSketch(Plane(origin=(-1.09, 0, -0.8), x_dir=(0, 1, 0), z_dir=(1, 0, 0))) as fillet1_piece_20_section:
        with BuildLine():
            CenterArc((FILLET1_R, FILLET1_R), FILLET1_R, 180, 90)
            Line((0, FILLET1_R), (0, 0))
            Line((0, 0), (FILLET1_R, 0))
        make_face()
    fillet1_piece_20 = extrude(amount=0.935, mode=Mode.PRIVATE)
    fillet1_piece_20 = fillet1_piece_20 - Plane(origin=(0, 0, -0.8), x_dir=(-1, 0, 0), z_dir=(0, -1, 0)) * Cylinder(0.405, 3, mode=Mode.PRIVATE)
    add(fillet1_piece_20, mode=Mode.SUBTRACT)
    with BuildSketch(Plane(origin=(1.09, 0, 0.8), x_dir=(0, 1, 0), z_dir=(-1, 0, 0))) as fillet1_piece_21_section:
        with BuildLine():
            CenterArc((FILLET1_R, FILLET1_R), FILLET1_R, 180, 90)
            Line((0, FILLET1_R), (0, 0))
            Line((0, 0), (FILLET1_R, 0))
        make_face()
    fillet1_piece_21 = extrude(amount=0.935, mode=Mode.PRIVATE)
    fillet1_piece_21 = fillet1_piece_21 - Plane(origin=(0, 0, 0.8), x_dir=(1, 0, 0), z_dir=(0, -1, 0)) * Cylinder(0.405, 3, mode=Mode.PRIVATE)
    add(fillet1_piece_21, mode=Mode.SUBTRACT)

    # Fillet2: read off the stored shape, not the designer's step
    # Fillet2 outline → Fillet2 (cut)
    with BuildSketch(Plane.YZ.offset(FILLET2_START)):
        with BuildLine():
            Line((0.96, 0.82), (0.86, 0.82))
            ThreePointArc((0.86, 0.82), (0.930710678, 0.790710678), (0.96, 0.72))
            Line((0.96, 0.72), (0.96, 0.82))
        make_face()
        with BuildLine():
            ThreePointArc((-0.02, 0.72), (0.009289322, 0.790710678), (0.08, 0.82))
            Line((0.08, 0.82), (-0.02, 0.82))
            Line((-0.02, 0.82), (-0.02, 0.72))
        make_face()
        with BuildLine():
            Line((-0.02, -0.82), (0.08, -0.82))
            ThreePointArc((0.08, -0.82), (0.009289322, -0.790710678), (-0.02, -0.72))
            Line((-0.02, -0.72), (-0.02, -0.82))
        make_face()
        with BuildLine():
            ThreePointArc((0.96, -0.72), (0.930710678, -0.790710678), (0.86, -0.82))
            Line((0.86, -0.82), (0.96, -0.82))
            Line((0.96, -0.82), (0.96, -0.72))
        make_face()
    extrude(amount=FILLET2_DEPTH, mode=Mode.SUBTRACT)


solid = part.part
